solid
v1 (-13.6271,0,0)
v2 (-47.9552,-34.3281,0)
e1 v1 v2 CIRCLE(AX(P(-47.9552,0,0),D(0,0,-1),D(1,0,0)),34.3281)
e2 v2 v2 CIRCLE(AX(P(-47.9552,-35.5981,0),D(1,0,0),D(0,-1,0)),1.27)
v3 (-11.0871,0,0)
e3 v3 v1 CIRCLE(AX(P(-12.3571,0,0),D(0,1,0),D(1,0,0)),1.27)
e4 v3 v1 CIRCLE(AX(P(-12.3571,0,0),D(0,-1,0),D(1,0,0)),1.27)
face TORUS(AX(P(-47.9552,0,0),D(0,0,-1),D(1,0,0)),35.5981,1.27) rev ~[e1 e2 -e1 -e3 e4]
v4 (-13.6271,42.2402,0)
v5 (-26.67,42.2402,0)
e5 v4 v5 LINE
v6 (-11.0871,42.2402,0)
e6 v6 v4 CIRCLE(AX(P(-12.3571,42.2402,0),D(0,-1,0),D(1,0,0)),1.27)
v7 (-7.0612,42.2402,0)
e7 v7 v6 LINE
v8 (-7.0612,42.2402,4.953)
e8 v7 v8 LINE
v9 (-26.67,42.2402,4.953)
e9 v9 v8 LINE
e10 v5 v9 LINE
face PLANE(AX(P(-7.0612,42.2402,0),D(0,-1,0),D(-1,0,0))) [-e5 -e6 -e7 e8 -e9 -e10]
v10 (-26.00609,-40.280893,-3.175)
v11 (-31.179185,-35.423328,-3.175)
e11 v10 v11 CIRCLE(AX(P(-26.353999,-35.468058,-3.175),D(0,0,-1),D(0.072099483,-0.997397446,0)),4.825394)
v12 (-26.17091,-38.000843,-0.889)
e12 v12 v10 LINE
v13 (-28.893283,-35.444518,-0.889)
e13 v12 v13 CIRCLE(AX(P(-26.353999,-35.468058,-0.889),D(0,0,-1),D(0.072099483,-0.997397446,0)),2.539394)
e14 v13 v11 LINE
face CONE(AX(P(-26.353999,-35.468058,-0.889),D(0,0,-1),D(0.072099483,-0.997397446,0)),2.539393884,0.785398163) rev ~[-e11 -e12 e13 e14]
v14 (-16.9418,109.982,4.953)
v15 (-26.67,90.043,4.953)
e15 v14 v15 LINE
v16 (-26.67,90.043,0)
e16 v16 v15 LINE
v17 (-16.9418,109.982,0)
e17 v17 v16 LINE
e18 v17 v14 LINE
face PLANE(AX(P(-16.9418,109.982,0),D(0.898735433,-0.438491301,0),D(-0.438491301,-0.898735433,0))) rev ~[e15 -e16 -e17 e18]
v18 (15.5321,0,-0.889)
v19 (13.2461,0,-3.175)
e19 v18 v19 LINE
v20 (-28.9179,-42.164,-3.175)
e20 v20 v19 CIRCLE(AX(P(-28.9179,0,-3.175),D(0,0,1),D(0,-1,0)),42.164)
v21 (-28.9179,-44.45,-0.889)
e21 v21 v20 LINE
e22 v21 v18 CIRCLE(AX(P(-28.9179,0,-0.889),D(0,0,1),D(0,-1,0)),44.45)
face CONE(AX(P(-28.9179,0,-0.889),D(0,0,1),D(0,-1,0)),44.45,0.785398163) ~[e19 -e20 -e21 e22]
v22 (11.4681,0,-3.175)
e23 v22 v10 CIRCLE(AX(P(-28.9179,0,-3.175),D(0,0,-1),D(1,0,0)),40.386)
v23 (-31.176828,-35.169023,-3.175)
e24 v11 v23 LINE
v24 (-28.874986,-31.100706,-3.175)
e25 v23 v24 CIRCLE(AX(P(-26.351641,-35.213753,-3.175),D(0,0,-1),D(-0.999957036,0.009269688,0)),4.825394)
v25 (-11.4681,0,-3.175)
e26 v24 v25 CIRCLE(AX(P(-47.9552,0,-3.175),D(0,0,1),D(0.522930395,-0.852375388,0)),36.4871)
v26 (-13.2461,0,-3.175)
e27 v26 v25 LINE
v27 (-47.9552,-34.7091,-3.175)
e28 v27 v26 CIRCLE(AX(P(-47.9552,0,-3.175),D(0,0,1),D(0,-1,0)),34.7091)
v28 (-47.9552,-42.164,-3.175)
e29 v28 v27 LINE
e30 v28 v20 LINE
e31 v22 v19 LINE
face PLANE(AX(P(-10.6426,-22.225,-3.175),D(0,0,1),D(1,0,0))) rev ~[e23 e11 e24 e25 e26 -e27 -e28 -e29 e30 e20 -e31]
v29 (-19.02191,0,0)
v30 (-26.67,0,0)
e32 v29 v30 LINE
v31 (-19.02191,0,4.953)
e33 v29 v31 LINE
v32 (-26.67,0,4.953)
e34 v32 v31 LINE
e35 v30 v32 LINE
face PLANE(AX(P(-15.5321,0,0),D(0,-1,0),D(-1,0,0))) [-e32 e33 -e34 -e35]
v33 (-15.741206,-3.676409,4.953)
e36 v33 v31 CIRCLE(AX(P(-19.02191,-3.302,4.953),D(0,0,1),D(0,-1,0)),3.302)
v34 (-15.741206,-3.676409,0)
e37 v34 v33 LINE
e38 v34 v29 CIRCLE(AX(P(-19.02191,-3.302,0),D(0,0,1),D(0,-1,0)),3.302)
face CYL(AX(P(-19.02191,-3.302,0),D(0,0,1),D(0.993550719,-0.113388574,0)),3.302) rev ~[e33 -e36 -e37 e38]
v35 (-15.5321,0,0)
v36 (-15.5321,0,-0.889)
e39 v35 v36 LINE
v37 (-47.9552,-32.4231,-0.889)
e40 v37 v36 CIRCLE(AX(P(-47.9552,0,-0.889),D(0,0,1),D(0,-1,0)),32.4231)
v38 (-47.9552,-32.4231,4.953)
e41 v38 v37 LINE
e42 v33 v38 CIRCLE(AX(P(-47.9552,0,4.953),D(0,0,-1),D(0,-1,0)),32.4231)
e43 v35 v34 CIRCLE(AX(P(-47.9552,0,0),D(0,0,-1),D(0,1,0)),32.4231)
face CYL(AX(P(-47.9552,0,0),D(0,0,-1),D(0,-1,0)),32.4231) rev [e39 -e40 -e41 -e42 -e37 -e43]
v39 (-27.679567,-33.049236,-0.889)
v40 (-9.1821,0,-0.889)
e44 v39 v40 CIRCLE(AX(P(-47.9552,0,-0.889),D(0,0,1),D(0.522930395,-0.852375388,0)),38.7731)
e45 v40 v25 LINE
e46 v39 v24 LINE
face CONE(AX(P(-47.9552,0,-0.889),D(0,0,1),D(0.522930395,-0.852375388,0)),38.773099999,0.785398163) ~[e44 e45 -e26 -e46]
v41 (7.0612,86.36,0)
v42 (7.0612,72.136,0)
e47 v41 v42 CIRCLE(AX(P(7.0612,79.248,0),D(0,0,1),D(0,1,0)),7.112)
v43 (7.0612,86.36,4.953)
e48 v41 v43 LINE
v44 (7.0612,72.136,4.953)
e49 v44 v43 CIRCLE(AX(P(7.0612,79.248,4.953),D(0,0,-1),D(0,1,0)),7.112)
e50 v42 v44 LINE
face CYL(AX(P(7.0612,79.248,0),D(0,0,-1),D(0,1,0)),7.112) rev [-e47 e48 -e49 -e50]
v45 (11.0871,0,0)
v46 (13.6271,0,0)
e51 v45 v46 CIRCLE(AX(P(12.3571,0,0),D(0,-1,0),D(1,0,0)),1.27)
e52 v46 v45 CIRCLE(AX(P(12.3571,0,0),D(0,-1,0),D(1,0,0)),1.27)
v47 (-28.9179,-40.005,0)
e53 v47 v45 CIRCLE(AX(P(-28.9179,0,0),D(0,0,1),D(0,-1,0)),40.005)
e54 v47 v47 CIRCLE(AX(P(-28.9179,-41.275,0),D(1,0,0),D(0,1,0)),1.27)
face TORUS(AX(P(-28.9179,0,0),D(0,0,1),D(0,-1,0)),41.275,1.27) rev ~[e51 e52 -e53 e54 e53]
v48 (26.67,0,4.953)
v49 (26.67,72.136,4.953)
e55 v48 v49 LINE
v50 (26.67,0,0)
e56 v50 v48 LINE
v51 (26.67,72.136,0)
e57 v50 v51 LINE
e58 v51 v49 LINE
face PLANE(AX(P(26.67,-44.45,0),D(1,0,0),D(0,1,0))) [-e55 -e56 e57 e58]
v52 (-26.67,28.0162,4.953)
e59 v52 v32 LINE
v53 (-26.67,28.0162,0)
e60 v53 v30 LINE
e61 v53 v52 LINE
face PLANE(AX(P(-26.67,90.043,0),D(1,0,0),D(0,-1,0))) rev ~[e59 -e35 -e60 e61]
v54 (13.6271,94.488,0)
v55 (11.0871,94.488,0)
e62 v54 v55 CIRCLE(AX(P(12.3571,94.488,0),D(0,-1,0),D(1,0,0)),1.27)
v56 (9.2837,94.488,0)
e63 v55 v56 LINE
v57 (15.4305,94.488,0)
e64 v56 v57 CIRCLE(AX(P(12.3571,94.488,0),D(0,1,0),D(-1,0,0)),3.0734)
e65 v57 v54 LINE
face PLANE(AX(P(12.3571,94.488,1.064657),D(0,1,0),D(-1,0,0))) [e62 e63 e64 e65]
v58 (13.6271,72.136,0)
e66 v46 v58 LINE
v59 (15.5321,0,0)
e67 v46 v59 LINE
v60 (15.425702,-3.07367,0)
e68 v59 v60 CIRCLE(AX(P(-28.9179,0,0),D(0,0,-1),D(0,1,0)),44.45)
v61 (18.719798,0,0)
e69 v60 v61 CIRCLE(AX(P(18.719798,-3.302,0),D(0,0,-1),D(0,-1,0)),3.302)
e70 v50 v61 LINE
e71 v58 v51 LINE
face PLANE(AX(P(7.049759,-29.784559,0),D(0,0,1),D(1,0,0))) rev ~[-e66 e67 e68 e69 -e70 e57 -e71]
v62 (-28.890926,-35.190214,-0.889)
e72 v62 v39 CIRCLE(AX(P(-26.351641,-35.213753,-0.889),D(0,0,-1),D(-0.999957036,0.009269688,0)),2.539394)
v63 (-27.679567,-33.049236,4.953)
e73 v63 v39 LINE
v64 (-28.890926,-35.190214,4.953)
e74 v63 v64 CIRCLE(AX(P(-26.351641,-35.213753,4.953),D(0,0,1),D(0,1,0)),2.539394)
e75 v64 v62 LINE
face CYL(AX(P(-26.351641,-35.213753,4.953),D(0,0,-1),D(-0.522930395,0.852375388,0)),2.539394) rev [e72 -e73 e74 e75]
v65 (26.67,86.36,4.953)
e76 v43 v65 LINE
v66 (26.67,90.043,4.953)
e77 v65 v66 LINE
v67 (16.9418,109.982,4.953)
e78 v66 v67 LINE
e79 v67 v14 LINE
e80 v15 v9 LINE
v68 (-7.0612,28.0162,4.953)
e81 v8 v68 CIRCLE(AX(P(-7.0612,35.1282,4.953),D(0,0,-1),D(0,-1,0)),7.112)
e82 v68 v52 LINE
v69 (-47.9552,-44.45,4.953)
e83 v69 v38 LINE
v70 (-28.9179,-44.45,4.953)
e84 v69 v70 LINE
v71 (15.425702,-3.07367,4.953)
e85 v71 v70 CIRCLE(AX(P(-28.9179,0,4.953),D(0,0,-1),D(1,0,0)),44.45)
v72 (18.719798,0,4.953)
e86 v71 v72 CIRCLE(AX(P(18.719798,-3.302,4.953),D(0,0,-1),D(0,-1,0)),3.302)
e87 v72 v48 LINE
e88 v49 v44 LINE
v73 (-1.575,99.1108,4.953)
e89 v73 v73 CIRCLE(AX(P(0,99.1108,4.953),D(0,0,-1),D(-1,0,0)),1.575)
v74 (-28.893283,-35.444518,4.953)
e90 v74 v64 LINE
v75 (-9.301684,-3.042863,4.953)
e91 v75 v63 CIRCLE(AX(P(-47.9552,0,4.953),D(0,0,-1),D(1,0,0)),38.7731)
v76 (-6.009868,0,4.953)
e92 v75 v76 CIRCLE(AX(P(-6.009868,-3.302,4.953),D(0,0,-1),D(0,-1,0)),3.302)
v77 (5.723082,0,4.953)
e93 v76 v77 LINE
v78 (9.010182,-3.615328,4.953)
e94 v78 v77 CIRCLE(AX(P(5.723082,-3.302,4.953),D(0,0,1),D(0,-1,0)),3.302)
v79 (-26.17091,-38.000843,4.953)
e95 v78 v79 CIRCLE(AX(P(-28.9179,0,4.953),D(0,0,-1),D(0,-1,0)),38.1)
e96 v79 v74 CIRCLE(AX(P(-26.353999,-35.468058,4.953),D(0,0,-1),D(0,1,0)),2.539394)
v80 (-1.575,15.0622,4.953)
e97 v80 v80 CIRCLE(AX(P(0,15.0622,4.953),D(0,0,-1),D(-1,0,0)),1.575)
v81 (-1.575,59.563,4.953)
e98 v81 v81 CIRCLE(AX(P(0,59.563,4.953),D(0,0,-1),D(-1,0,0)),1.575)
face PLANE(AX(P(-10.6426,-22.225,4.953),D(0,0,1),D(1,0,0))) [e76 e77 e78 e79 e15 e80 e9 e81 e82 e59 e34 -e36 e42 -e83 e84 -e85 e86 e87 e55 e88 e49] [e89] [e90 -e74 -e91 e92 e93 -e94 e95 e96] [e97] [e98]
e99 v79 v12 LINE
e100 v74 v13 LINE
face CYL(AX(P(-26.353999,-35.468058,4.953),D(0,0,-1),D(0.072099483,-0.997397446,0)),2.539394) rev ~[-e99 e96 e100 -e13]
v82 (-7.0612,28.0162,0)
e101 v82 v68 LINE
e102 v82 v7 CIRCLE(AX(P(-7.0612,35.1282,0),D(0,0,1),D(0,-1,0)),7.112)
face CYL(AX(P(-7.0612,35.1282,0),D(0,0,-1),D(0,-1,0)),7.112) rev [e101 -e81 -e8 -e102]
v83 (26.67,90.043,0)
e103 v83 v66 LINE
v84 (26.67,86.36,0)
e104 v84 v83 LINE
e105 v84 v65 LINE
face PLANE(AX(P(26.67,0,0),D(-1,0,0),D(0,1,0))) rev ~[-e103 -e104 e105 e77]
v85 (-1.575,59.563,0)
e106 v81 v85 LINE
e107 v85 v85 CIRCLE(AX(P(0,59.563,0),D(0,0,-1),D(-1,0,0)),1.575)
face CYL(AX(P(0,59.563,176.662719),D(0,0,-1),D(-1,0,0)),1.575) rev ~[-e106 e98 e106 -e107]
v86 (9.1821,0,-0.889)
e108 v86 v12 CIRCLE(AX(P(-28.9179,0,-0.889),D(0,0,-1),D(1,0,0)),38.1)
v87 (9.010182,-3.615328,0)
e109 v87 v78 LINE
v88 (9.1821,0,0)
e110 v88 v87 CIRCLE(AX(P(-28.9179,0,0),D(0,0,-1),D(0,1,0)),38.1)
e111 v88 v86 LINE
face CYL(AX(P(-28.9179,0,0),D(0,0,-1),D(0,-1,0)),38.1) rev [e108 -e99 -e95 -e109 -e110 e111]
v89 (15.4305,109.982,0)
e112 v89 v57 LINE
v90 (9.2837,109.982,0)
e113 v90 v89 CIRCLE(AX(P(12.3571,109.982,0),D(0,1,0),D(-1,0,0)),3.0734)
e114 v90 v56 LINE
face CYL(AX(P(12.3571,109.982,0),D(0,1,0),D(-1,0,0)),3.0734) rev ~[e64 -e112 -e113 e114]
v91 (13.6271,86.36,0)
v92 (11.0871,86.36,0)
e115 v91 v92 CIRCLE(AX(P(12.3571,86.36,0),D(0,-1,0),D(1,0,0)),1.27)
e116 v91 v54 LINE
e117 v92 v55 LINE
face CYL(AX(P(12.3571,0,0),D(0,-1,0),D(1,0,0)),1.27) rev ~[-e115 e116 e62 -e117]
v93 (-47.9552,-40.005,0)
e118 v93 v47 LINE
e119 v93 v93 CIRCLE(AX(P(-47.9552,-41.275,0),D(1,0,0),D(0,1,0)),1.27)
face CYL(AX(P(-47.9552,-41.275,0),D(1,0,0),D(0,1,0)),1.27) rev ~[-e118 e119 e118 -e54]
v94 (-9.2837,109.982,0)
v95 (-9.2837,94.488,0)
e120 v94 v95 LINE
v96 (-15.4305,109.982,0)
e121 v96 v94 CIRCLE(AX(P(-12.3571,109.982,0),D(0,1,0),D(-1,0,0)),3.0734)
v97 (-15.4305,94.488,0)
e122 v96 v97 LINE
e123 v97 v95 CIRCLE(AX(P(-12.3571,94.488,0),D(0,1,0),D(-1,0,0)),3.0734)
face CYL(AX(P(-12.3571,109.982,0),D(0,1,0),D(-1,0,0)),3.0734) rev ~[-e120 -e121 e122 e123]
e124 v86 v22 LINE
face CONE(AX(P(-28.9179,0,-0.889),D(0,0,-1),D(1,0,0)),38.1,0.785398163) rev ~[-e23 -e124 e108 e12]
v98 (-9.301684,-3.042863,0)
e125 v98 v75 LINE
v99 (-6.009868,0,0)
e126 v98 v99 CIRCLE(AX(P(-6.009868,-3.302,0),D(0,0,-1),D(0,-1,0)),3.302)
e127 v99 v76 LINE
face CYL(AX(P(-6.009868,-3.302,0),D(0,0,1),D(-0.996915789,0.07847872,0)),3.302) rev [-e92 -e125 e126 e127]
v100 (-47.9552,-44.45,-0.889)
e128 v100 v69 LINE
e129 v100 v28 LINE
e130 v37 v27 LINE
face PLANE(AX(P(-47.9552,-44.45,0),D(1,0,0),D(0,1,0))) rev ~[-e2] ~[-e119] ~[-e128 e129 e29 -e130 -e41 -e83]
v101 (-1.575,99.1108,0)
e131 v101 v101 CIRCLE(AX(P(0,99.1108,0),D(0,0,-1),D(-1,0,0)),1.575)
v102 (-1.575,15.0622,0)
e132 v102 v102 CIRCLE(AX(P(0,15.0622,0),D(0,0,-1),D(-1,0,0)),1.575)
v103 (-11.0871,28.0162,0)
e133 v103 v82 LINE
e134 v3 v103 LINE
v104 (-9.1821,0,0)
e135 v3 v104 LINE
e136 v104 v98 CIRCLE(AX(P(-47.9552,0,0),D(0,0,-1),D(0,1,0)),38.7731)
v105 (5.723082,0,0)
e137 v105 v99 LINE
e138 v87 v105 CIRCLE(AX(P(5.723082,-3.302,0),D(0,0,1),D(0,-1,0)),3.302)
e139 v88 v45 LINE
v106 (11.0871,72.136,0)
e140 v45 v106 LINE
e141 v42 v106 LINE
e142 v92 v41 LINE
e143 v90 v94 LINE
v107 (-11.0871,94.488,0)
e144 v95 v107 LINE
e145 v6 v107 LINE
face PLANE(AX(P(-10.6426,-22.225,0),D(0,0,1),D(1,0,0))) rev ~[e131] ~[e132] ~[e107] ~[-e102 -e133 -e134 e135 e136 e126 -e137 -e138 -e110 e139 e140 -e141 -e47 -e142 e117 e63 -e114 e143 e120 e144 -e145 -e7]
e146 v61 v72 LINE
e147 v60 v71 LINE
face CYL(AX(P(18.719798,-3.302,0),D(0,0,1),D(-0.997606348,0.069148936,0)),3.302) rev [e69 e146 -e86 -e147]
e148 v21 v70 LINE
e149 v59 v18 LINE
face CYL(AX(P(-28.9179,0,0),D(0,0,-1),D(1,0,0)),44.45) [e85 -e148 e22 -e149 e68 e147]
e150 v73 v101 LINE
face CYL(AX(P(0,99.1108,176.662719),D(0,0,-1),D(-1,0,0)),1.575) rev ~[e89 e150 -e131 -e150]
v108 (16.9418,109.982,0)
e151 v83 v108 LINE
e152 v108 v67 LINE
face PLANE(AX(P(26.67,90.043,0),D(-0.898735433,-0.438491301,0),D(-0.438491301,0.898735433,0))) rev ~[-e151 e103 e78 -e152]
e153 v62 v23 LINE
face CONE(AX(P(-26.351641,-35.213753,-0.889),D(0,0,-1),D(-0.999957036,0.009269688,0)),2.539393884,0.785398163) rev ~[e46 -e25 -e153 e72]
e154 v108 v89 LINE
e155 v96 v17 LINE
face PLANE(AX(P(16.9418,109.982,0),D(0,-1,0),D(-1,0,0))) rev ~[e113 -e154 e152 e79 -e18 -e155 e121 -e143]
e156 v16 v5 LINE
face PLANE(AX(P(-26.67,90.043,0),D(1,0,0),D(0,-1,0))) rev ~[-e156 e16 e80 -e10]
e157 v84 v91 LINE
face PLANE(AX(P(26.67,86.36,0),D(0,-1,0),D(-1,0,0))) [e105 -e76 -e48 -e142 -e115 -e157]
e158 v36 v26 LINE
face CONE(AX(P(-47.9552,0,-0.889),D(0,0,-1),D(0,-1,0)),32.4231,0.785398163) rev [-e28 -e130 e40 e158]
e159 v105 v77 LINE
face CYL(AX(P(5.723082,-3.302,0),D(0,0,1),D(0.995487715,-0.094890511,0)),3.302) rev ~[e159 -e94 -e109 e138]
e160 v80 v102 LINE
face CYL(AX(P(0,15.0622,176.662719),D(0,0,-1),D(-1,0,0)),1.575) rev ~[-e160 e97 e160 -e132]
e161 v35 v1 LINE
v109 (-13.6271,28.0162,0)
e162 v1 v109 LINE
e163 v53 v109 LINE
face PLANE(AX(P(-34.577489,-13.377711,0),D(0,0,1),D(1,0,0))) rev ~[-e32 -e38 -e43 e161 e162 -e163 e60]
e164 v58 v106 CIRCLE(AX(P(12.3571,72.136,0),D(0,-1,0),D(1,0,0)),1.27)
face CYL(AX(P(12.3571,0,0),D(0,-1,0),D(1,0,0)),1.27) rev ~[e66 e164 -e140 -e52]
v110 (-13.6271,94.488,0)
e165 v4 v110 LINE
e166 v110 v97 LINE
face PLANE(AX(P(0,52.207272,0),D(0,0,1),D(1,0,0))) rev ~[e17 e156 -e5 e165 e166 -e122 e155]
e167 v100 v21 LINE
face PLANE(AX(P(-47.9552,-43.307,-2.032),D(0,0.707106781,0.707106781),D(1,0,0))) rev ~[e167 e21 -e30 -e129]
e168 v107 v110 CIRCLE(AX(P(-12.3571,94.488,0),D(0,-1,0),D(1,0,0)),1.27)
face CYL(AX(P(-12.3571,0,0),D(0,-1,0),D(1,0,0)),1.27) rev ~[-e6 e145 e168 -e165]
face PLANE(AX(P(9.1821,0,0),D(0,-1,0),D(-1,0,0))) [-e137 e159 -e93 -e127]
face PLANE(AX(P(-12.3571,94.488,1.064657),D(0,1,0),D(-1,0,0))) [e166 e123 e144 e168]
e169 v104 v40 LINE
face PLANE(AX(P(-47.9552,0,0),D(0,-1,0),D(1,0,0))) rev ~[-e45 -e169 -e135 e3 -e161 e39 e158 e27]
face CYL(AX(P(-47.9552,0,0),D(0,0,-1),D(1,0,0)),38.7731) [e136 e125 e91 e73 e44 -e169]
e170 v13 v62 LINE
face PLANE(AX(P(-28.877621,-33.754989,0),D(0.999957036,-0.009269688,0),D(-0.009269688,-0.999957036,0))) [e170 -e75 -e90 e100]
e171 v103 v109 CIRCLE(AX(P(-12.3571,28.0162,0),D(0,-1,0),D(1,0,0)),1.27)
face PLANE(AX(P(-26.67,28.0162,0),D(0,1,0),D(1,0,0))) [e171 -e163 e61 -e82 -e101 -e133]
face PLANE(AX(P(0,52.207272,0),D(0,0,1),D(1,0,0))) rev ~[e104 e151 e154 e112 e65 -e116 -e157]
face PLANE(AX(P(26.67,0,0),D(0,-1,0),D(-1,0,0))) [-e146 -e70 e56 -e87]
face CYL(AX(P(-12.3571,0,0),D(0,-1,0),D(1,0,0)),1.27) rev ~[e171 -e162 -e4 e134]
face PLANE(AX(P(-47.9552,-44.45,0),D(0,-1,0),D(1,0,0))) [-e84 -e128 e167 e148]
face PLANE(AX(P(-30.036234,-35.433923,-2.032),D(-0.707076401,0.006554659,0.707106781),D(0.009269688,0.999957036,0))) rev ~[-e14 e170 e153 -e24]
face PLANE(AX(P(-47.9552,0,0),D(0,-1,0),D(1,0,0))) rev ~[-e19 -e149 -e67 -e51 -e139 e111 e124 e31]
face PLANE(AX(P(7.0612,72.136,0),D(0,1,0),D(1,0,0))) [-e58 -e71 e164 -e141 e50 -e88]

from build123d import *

# Parameters (mm, degrees)
F1_DEPTH       = 4.953
F3_DEPTH       = 4.954
F5_DEPTH       = 109.983
F7_DEPTH       = 15.494
F8_W           = 74.6252
F8_H           = 44.45
F9_DEPTH       = 4.953
F9_DEPTH_BACK  = 3.175
F11_R          = 1.27
F17_DEPTH      = 3.176
F17_DEPTH_BACK = 4.954
F19_D          = 3.15
F20_R          = 3.302
F21_R          = 2.5393938838
F22_SIZE       = 2.286


# Not quite as in the source:
# - a feature names something its author has since deleted; it is built from what else it names


with BuildPart() as f1:
    # F0 (on Top) → F1 (new body)
    with BuildSketch(Plane.XY):
        Polygon((-26.67, 0), (26.67, 0), (26.67, 90.043), (16.9418, 109.982), (-16.9418, 109.982), (-26.67, 90.043), align=None)
    extrude(amount=F1_DEPTH)

    # F2 (on Top) → F3 (cut, through all)
    with BuildSketch(Plane.XY):
        with BuildLine():
            Line((-26.67, 28.0162), (-7.0612, 28.0162))
            ThreePointArc((-7.0612, 28.0162), (0.0508, 35.1282), (-7.0612, 42.2402))
            Line((-7.0612, 42.2402), (-26.67, 42.2402))
            Line((-26.67, 42.2402), (-26.67, 28.0162))
        make_face()
        with BuildLine():
            Line((26.67, 86.36), (7.0612, 86.36))
            ThreePointArc((7.0612, 86.36), (-0.0508, 79.248), (7.0612, 72.136))
            Line((7.0612, 72.136), (26.67, 72.136))
            Line((26.67, 72.136), (26.67, 86.36))
        make_face()
    extrude(amount=F3_DEPTH, mode=Mode.SUBTRACT)

    # F4 (on face) → F5 (cut, through all)
    with BuildSketch(Plane.XZ):
        with BuildLine():
            ThreePointArc((-11.0871, 0), (-12.3571, 1.27), (-13.6271, 0))
            Line((-13.6271, 0), (-11.0871, 0))
        make_face()
        with BuildLine():
            ThreePointArc((13.6271, 0), (12.3571, 1.27), (11.0871, 0))
            Line((11.0871, 0), (13.6271, 0))
        make_face()
    extrude(amount=-F5_DEPTH, mode=Mode.SUBTRACT)

    # F6 (on face) → F7 (cut)
    with BuildSketch(Plane(origin=(0, 109.982, 0), x_dir=(-1, 0, 0), z_dir=(0, 1, 0))):
        with BuildLine():
            ThreePointArc((-9.2837, 0), (-12.3571, 3.0734), (-15.4305, 0))
            Line((-15.4305, 0), (-9.2837, 0))
        make_face()
        with BuildLine():
            ThreePointArc((15.4305, 0), (12.3571, 3.0734), (9.2837, 0))
            Line((9.2837, 0), (15.4305, 0))
        make_face()
    extrude(amount=-F7_DEPTH, mode=Mode.SUBTRACT)

    # F8 (on Top) → F9 (join, two sides)
    with BuildSketch(Plane.XY) as f9_sk:
        with Locations((-10.6426, -22.225)):
            Rectangle(F8_W, F8_H)
    extrude(amount=F9_DEPTH)
    extrude(f9_sk.sketch, amount=-F9_DEPTH_BACK)

    # F12: sweep along a path in F10
    with BuildLine(Plane.XY) as f12_path:
        Line((-47.9552, -41.275), (-28.9179, -41.275))
        ThreePointArc((-28.9179, -41.275), (0.2679323935, -29.1858323935), (12.3571, 0))
    # F11 (on face) → F12 (sweep, cut)
    with BuildSketch(Plane(origin=(0, 0, 0), x_dir=(-1, 0, 0), z_dir=(0, 1, 0))):
        with Locations((-12.3571, 0)):
            Circle(F11_R)
    sweep(path=f12_path.line, mode=Mode.SUBTRACT)

    # F15: sweep along a path in F13
    with BuildLine(Plane.XY) as f15_path:
        ThreePointArc((-12.3571, 0), (-22.7835420926, -25.1716579074), (-47.9552, -35.5981))
    # F14 (on face) → F15 (sweep, cut)
    with BuildSketch(Plane(origin=(0, 0, 0), x_dir=(-1, 0, 0), z_dir=(0, 1, 0))):
        with BuildLine():
            ThreePointArc((11.0871, 0), (12.3571, -1.27), (13.6271, 0))
            ThreePointArc((13.6271, 0), (12.3571, 1.27), (11.0871, 0))
        make_face()
    sweep(path=f15_path.line, mode=Mode.SUBTRACT)

    # F16 (on Top) → F17 (cut, two sides)
    with BuildSketch(Plane.XY) as f17_sk:
        with BuildLine():
            Line((-28.9179, -44.45), (26.67, -44.45))
            Line((26.67, -44.45), (26.67, 0))
            Line((26.67, 0), (15.5321, 0))
            ThreePointArc((15.5321, 0), (2.5129964237, -31.4308964237), (-28.9179, -44.45))
        make_face()
        with BuildLine():
            ThreePointArc((-28.9179, -38.1), (-1.9771316368, -26.9407683632), (9.1821, 0))
            Line((9.1821, 0), (-9.1821, 0))
            ThreePointArc((-9.1821, 0), (-14.4660215428, -19.5404250178), (-28.8776213731, -33.7549889252))
            Line((-28.8776213731, -33.7549889252), (-28.9179, -38.1))
        make_face()
        with BuildLine():
            ThreePointArc((-47.9552, -32.4231), (-25.0286061229, -22.9265938771), (-15.5321, 0))
            Line((-15.5321, 0), (-47.9552, 0))
            Line((-47.9552, 0), (-47.9552, -32.4231))
        make_face()
    extrude(amount=-F17_DEPTH, mode=Mode.SUBTRACT)
    extrude(f17_sk.sketch, amount=F17_DEPTH_BACK, mode=Mode.SUBTRACT)

    # F19 (through all)
    with Locations(Plane.XY.offset(4.953)):
        with Locations((0, 99.1108), (0, 59.563), (0, 15.0622)):
            Hole(F19_D / 2)

    # F20
    f20_edges = [f1.edges().sort_by_distance(p)[0] for p in [
        (9.1821, 0, 2.4765),
        (-9.1821, 0, 2.4765),
        (15.5321, 0, 2.4765),
        (-15.5321, 0, 2.4765),
    ]]
    fillet(f20_edges, radius=F20_R)

    # F21
    f21_edges = [f1.edges().sort_by_distance(p)[0] for p in [
        (-28.877621, -33.754989, 0.889),
        (-28.9179, -38.1, 0.889),
    ]]
    fillet(f21_edges, radius=F21_R)

    # F22
    f22_edges = [f1.edges().sort_by_distance(p)[0] for p in [
        (-38.43655, -44.45, -3.175),
        (-14.121028, -18.936792, -3.175),
        (-28.561794, -33.963255, -3.175),
        (-28.892105, -35.317366, -3.175),
        (-28.092277, -37.319249, -3.175),
        (-1.022826, -25.951394, -3.175),
        (-25.028606, -22.926594, -3.175),
        (2.512996, -31.430896, -3.175),
    ]]
    chamfer(f22_edges, length=F22_SIZE)


solid = f1.part
